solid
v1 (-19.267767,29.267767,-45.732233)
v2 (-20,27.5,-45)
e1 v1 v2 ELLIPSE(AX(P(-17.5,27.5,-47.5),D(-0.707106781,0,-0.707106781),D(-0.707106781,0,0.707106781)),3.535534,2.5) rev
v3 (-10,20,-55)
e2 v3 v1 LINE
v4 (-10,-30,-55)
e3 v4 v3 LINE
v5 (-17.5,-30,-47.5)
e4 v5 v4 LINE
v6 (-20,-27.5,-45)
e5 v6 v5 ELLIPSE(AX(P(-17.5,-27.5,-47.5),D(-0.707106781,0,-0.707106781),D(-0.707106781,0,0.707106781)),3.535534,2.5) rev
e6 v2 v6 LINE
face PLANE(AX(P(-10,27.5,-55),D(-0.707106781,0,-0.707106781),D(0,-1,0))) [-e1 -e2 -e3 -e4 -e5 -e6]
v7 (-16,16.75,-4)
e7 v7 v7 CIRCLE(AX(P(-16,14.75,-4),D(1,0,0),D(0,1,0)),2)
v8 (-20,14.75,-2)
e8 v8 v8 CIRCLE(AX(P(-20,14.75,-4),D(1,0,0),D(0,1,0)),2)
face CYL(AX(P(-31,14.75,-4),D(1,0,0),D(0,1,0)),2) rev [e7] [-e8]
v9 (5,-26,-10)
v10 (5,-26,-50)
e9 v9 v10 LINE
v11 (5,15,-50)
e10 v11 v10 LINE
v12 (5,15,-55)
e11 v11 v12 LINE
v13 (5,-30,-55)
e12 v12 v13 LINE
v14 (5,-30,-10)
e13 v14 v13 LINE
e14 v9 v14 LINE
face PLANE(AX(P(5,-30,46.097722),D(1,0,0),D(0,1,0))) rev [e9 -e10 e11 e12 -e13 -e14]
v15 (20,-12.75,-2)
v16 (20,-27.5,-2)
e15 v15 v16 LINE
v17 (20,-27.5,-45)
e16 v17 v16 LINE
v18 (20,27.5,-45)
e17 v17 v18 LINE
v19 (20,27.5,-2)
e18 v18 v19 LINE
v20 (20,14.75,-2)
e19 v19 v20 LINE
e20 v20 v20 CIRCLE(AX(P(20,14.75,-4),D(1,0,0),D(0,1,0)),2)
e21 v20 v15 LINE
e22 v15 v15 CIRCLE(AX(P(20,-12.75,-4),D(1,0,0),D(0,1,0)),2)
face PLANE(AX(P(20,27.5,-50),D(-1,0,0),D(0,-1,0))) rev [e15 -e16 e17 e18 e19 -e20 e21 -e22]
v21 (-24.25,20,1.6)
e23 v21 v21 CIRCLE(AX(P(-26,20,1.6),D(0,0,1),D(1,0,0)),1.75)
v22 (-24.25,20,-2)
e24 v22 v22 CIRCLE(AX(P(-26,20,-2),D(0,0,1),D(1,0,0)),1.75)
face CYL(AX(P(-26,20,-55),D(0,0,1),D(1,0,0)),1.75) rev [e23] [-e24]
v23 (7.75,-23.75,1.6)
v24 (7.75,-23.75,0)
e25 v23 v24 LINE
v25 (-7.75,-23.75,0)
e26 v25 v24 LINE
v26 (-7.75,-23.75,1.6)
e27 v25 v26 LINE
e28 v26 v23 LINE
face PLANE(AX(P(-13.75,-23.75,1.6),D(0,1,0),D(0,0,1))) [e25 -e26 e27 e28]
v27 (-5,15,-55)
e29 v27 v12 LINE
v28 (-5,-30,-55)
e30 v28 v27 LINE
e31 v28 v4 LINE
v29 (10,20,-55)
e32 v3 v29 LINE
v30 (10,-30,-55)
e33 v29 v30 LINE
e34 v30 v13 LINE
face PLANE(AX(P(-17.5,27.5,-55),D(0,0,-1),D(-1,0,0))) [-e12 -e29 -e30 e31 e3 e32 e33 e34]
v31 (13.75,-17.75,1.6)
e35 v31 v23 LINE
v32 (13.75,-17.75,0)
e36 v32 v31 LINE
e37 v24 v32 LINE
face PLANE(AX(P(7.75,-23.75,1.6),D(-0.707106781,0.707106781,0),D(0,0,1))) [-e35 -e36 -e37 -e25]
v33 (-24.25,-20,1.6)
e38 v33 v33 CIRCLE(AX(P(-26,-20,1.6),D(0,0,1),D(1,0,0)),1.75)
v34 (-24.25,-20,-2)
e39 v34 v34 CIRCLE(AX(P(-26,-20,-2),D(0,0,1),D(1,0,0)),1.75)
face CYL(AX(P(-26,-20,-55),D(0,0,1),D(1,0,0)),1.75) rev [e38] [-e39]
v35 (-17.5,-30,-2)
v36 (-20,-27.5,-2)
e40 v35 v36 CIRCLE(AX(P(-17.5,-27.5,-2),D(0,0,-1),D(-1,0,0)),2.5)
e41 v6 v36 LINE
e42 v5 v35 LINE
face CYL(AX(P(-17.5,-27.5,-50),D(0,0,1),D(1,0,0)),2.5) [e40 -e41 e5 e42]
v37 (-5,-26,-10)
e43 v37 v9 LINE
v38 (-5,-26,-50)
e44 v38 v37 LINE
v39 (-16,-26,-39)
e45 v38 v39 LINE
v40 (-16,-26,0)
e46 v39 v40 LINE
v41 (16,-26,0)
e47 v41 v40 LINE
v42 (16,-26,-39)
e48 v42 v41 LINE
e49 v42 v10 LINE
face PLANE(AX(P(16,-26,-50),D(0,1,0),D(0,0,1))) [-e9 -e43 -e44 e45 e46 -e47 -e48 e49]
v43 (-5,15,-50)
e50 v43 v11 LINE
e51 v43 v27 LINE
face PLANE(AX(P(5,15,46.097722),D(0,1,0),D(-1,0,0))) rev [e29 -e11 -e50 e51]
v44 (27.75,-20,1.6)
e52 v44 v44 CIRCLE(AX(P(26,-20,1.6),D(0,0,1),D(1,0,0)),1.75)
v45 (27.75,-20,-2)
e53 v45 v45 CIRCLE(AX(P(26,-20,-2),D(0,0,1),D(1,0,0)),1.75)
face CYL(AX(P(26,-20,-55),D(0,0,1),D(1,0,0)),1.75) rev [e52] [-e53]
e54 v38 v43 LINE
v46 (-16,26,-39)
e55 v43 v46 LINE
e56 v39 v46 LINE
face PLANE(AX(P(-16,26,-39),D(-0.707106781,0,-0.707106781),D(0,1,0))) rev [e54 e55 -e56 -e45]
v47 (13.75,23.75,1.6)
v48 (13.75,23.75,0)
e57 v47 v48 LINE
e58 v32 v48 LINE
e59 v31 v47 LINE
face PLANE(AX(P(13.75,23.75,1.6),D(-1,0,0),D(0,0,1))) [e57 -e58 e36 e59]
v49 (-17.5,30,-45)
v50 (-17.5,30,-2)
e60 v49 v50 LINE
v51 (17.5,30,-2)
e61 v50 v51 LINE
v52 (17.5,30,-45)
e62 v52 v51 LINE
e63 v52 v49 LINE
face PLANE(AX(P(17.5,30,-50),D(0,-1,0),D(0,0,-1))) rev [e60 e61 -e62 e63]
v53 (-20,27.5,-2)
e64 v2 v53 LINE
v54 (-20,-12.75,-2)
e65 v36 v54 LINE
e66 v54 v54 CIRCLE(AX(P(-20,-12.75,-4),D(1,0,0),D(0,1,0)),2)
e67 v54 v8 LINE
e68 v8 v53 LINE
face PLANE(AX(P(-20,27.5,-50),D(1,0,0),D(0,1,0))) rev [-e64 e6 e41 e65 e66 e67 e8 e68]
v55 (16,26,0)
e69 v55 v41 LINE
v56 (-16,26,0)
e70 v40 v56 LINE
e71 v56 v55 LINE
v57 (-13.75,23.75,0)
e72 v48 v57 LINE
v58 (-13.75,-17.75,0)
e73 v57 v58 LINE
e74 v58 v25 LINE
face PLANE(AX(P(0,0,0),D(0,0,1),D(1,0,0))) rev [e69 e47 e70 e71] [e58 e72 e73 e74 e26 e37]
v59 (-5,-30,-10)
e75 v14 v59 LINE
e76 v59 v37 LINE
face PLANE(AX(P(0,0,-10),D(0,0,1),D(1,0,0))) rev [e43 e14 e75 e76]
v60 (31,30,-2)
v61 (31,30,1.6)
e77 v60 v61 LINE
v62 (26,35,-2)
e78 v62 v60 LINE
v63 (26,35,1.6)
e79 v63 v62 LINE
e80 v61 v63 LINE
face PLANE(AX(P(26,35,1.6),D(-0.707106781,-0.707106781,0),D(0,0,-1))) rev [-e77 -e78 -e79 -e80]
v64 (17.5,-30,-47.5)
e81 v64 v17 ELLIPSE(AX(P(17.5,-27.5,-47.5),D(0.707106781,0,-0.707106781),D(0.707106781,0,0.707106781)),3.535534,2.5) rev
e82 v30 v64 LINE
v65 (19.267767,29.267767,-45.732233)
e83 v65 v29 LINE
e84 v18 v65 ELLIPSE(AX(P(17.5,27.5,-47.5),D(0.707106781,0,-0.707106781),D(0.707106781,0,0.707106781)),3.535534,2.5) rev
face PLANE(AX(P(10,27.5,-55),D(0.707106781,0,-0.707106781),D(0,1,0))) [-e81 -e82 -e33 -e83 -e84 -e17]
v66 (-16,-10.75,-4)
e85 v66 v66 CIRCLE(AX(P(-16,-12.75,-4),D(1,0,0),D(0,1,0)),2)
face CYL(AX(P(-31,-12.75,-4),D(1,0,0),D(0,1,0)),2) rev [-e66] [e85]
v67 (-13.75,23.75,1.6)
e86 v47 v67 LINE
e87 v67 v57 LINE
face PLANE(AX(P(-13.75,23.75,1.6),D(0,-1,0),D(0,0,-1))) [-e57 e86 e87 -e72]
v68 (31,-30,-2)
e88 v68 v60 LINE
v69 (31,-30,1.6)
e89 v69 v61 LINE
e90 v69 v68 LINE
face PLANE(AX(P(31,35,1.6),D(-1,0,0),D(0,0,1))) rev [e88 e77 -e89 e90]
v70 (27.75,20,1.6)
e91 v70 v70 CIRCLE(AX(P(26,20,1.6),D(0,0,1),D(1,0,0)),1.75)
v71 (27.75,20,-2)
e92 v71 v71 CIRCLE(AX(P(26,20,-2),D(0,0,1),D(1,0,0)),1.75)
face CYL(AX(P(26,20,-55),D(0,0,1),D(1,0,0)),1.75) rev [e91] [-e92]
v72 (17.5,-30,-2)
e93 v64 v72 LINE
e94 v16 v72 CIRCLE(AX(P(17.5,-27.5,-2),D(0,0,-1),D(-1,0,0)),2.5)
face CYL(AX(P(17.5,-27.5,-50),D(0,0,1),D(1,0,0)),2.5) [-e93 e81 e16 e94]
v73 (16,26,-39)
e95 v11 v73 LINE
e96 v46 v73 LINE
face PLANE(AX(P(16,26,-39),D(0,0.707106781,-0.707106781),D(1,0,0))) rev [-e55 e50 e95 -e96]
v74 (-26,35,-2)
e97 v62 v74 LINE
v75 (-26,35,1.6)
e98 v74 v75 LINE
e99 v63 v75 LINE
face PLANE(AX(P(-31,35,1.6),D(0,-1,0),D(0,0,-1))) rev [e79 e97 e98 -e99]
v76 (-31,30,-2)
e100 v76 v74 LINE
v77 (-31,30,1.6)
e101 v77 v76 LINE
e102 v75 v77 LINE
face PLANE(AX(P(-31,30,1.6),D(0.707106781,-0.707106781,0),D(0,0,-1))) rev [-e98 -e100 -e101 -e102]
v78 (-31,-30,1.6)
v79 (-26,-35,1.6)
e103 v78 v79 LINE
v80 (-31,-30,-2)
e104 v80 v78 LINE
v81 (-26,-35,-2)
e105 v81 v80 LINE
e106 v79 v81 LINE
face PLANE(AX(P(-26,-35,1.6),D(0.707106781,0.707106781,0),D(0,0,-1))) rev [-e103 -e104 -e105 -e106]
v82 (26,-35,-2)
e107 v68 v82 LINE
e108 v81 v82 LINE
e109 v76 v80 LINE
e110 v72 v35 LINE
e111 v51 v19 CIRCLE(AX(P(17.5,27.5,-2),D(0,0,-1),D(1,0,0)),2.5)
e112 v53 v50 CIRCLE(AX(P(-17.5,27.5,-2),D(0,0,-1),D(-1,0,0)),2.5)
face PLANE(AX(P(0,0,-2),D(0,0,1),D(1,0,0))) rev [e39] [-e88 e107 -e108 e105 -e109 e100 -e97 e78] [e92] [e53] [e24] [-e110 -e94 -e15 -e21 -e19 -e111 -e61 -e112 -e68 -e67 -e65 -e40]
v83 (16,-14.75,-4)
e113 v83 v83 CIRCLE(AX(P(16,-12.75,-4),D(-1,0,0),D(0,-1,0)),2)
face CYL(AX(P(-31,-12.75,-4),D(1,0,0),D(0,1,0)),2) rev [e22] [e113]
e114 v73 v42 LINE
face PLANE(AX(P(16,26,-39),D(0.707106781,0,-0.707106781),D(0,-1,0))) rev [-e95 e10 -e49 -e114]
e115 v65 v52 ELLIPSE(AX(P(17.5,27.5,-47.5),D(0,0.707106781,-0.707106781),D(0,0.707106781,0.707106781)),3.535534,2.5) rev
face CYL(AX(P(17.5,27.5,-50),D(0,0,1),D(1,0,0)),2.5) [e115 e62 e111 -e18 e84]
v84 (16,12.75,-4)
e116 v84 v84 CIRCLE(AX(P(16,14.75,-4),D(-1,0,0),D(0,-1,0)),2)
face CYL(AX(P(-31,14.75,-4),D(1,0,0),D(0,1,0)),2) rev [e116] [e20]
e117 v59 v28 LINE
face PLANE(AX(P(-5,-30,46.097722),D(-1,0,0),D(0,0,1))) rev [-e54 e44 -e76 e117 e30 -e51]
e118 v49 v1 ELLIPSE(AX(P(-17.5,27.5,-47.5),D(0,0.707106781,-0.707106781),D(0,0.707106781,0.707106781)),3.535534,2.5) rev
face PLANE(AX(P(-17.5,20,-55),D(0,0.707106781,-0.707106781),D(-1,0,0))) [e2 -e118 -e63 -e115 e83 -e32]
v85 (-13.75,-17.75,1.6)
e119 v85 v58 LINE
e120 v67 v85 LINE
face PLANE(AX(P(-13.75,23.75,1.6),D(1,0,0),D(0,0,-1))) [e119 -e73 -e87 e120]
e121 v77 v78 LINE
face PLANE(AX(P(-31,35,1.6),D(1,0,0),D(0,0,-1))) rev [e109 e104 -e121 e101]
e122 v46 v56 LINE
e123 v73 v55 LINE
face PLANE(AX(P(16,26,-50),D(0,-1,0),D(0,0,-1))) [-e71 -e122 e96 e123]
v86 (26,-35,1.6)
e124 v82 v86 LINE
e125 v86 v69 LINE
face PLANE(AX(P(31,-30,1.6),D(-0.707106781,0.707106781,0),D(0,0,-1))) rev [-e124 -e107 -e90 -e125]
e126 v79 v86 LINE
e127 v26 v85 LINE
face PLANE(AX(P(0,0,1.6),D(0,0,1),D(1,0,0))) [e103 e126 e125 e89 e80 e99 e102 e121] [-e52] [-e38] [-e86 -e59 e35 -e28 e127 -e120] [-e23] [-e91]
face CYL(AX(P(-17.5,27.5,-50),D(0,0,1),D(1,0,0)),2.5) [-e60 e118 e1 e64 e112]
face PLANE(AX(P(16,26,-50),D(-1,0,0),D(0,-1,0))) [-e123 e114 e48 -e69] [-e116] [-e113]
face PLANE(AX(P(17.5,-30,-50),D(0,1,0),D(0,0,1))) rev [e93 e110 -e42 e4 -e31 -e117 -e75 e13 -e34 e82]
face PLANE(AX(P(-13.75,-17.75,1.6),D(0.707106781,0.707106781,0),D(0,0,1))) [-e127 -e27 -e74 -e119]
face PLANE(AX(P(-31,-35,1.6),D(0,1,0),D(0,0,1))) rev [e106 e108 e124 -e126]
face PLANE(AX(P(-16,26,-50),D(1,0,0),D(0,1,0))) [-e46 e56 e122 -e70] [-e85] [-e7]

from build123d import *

# Parameters (mm, degrees)
SKETCH1_W           = 62
SKETCH1_H           = 70
SKETCH1_W_2         = 27.5
SKETCH1_H_2         = 47.5
BOSS_EXTRUDE1_DEPTH = 1.6
CHAMFER1_SIZE       = 5
CHAMFER2_SIZE       = 6
SKETCH3_W           = 32
SKETCH3_H           = 52
BOSS_EXTRUDE2_DEPTH = 50
BOSS_EXTRUDE3_DEPTH = 5
SKETCH5_W           = 10
SKETCH5_H           = 45
CUT_EXTRUDE1_DEPTH  = 45
CHAMFER3_SIZE       = 11
CHAMFER4_SIZE       = 10
SKETCH7_R           = 2
CUT_EXTRUDE2_DEPTH  = 83.770767787
MOVE_START          = -2
MOVE_FACE1_DEPTH    = 2
SKETCH8_R           = 1.75
CUT_EXTRUDE3_DEPTH  = 74.413622714


# Read off the part's stored shape, not the designer's step: Move Face1
# Some blends are built 0.0001 mm under size
with BuildPart() as part:
    # Sketch1 → Boss-Extrude1 (new body)
    with BuildSketch(Plane.XY):
        Rectangle(SKETCH1_W, SKETCH1_H)
        Rectangle(SKETCH1_W_2, SKETCH1_H_2, mode=Mode.SUBTRACT)
    extrude(amount=BOSS_EXTRUDE1_DEPTH)

    # Chamfer1
    chamfer1_edges = [part.edges().sort_by_distance(p)[0] for p in [
        (-31, 35, 0.8),
        (31, 35, 0.8),
        (31, -35, 0.8),
        (-31, -35, 0.8),
    ]]
    chamfer(chamfer1_edges, length=CHAMFER1_SIZE)

    # Chamfer2
    chamfer2_edges = [part.edges().sort_by_distance(p)[0] for p in [
        (-13.75, -23.75, 0.8),
        (13.75, -23.75, 0.8),
    ]]
    chamfer(chamfer2_edges, length=CHAMFER2_SIZE)

    # Sketch3 → Boss-Extrude2 (add)
    with BuildSketch(Plane(origin=(0, 0, 0), x_dir=(-1, 0, 0), z_dir=(0, 0, -1))):
        with BuildLine():
            Line((-20, 27.5), (-20, -27.5))
            ThreePointArc((-20, -27.5), (-19.267766953, -29.267766953), (-17.5, -30))
            Line((-17.5, -30), (17.5, -30))
            ThreePointArc((17.5, -30), (19.267766953, -29.267766953), (20, -27.5))
            Line((20, -27.5), (20, 27.5))
            ThreePointArc((20, 27.5), (19.267766953, 29.267766953), (17.5, 30))
            Line((17.5, 30), (-17.5, 30))
            ThreePointArc((-17.5, 30), (-19.267766953, 29.267766953), (-20, 27.5))
        make_face()
        Rectangle(SKETCH3_W, SKETCH3_H, mode=Mode.SUBTRACT)
    extrude(amount=BOSS_EXTRUDE2_DEPTH)

    # Sketch4 → Boss-Extrude3 (add)
    with BuildSketch(Plane(origin=(0, 0, -50), x_dir=(-1, 0, 0), z_dir=(0, 0, -1))):
        with BuildLine():
            Line((17.5, 30), (-17.5, 30))
            ThreePointArc((-17.5, 30), (-19.267766953, 29.267766953), (-20, 27.5))
            Line((-20, 27.5), (-20, -27.5))
            ThreePointArc((-20, -27.5), (-19.267766953, -29.267766953), (-17.5, -30))
            Line((-17.5, -30), (17.5, -30))
            ThreePointArc((17.5, -30), (19.267766953, -29.267766953), (20, -27.5))
            Line((20, -27.5), (20, 27.5))
            ThreePointArc((20, 27.5), (19.267766953, 29.267766953), (17.5, 30))
        make_face()
    extrude(amount=BOSS_EXTRUDE3_DEPTH)

    # Sketch5 → Cut-Extrude1 (cut)
    with BuildSketch(Plane(origin=(0, 0, -55), x_dir=(-1, 0, 0), z_dir=(0, 0, -1))):
        with Locations((0, -7.5)):
            Rectangle(SKETCH5_W, SKETCH5_H)
    extrude(amount=-CUT_EXTRUDE1_DEPTH, mode=Mode.SUBTRACT)

    # Chamfer3
    chamfer3_edges = [part.edges().sort_by_distance(p)[0] for p in [
        (-16, 0, -50),
        (0, 26, -50),
        (16, 0, -50),
    ]]
    chamfer(chamfer3_edges, length=CHAMFER3_SIZE - 0.0001)  # a hair under: the kernel refuses the full size

    # Chamfer4
    # the kernel refuses this chamfer: 10 mm, written as the material it takes off along each edge
    with BuildSketch(Plane(origin=(-43.21682988, 30, -55), x_dir=(0, -0.9996219169112968, -0.027495876610586317), z_dir=(1, 0, 0))) as chamfer4_piece_1:
        Polygon((CHAMFER4_SIZE * 0.999621916911, -CHAMFER4_SIZE * 0.0274958766106), (-CHAMFER4_SIZE * 0.0274958766106, -CHAMFER4_SIZE * 0.999621916911), (0, 0), align=None)
    extrude(amount=86.433659759, mode=Mode.SUBTRACT)
    with BuildSketch(Plane(origin=(20, 53.21682988, -55), x_dir=(-0.9996219169112968, 0, -0.027495876610586317), z_dir=(0, -1, 0)), Plane(origin=(-20, -53.21682988, -55), x_dir=(0.9996219169112968, 0, -0.027495876610586317), z_dir=(0, 1, 0))) as chamfer4_piece_2:
        Polygon((CHAMFER4_SIZE * 0.999621916911, -CHAMFER4_SIZE * 0.0274958766106), (-CHAMFER4_SIZE * 0.0274958766106, -CHAMFER4_SIZE * 0.999621916911), (0, 0), align=None)
    extrude(amount=106.433659759, mode=Mode.SUBTRACT)

    # Sketch7 → Cut-Extrude2 (cut, through all)
    with BuildSketch(Plane(origin=(20, 0, 0), x_dir=(0, 0, -1), z_dir=(1, 0, 0))):
        with Locations(Location((4, 14.75, 0), (0, 0, 90))):
            Circle(SKETCH7_R)
        with Locations(Location((4, -12.75, 0), (0, 0, 90))):
            Circle(SKETCH7_R)
    extrude(amount=-CUT_EXTRUDE2_DEPTH, mode=Mode.SUBTRACT)

    # Move Face1 outline → Move Face1 (add)
    with BuildSketch(Plane.XY.offset(MOVE_START)):
        Polygon((-31, 30), (-31, -30), (-26, -35), (26, -35), (31, -30), (31, 30), (26, 35), (-26, 35), align=None)
        with BuildLine():
            ThreePointArc((-20, 27.5), (-19.267766953, 29.267766953), (-17.5, 30))
            Line((-17.5, 30), (17.5, 30))
            ThreePointArc((17.5, 30), (19.267766953, 29.267766953), (20, 27.5))
            Line((20, 27.5), (20, -27.5))
            ThreePointArc((20, -27.5), (19.267766953, -29.267766953), (17.5, -30))
            Line((17.5, -30), (-17.5, -30))
            ThreePointArc((-17.5, -30), (-19.267766953, -29.267766953), (-20, -27.5))
            Line((-20, -27.5), (-20, 27.5))
        make_face(mode=Mode.SUBTRACT)
    extrude(amount=MOVE_FACE1_DEPTH)

    # Sketch8 → Cut-Extrude3 (cut, through all)
    with BuildSketch(Plane.XY.offset(1.6)):
        with Locations((26, 20)):
            Circle(SKETCH8_R)
        with Locations((26, -20)):
            Circle(SKETCH8_R)
        with Locations((-26, -20)):
            Circle(SKETCH8_R)
        with Locations((-26, 20)):
            Circle(SKETCH8_R)
    extrude(amount=-CUT_EXTRUDE3_DEPTH, mode=Mode.SUBTRACT)


solid = part.part
